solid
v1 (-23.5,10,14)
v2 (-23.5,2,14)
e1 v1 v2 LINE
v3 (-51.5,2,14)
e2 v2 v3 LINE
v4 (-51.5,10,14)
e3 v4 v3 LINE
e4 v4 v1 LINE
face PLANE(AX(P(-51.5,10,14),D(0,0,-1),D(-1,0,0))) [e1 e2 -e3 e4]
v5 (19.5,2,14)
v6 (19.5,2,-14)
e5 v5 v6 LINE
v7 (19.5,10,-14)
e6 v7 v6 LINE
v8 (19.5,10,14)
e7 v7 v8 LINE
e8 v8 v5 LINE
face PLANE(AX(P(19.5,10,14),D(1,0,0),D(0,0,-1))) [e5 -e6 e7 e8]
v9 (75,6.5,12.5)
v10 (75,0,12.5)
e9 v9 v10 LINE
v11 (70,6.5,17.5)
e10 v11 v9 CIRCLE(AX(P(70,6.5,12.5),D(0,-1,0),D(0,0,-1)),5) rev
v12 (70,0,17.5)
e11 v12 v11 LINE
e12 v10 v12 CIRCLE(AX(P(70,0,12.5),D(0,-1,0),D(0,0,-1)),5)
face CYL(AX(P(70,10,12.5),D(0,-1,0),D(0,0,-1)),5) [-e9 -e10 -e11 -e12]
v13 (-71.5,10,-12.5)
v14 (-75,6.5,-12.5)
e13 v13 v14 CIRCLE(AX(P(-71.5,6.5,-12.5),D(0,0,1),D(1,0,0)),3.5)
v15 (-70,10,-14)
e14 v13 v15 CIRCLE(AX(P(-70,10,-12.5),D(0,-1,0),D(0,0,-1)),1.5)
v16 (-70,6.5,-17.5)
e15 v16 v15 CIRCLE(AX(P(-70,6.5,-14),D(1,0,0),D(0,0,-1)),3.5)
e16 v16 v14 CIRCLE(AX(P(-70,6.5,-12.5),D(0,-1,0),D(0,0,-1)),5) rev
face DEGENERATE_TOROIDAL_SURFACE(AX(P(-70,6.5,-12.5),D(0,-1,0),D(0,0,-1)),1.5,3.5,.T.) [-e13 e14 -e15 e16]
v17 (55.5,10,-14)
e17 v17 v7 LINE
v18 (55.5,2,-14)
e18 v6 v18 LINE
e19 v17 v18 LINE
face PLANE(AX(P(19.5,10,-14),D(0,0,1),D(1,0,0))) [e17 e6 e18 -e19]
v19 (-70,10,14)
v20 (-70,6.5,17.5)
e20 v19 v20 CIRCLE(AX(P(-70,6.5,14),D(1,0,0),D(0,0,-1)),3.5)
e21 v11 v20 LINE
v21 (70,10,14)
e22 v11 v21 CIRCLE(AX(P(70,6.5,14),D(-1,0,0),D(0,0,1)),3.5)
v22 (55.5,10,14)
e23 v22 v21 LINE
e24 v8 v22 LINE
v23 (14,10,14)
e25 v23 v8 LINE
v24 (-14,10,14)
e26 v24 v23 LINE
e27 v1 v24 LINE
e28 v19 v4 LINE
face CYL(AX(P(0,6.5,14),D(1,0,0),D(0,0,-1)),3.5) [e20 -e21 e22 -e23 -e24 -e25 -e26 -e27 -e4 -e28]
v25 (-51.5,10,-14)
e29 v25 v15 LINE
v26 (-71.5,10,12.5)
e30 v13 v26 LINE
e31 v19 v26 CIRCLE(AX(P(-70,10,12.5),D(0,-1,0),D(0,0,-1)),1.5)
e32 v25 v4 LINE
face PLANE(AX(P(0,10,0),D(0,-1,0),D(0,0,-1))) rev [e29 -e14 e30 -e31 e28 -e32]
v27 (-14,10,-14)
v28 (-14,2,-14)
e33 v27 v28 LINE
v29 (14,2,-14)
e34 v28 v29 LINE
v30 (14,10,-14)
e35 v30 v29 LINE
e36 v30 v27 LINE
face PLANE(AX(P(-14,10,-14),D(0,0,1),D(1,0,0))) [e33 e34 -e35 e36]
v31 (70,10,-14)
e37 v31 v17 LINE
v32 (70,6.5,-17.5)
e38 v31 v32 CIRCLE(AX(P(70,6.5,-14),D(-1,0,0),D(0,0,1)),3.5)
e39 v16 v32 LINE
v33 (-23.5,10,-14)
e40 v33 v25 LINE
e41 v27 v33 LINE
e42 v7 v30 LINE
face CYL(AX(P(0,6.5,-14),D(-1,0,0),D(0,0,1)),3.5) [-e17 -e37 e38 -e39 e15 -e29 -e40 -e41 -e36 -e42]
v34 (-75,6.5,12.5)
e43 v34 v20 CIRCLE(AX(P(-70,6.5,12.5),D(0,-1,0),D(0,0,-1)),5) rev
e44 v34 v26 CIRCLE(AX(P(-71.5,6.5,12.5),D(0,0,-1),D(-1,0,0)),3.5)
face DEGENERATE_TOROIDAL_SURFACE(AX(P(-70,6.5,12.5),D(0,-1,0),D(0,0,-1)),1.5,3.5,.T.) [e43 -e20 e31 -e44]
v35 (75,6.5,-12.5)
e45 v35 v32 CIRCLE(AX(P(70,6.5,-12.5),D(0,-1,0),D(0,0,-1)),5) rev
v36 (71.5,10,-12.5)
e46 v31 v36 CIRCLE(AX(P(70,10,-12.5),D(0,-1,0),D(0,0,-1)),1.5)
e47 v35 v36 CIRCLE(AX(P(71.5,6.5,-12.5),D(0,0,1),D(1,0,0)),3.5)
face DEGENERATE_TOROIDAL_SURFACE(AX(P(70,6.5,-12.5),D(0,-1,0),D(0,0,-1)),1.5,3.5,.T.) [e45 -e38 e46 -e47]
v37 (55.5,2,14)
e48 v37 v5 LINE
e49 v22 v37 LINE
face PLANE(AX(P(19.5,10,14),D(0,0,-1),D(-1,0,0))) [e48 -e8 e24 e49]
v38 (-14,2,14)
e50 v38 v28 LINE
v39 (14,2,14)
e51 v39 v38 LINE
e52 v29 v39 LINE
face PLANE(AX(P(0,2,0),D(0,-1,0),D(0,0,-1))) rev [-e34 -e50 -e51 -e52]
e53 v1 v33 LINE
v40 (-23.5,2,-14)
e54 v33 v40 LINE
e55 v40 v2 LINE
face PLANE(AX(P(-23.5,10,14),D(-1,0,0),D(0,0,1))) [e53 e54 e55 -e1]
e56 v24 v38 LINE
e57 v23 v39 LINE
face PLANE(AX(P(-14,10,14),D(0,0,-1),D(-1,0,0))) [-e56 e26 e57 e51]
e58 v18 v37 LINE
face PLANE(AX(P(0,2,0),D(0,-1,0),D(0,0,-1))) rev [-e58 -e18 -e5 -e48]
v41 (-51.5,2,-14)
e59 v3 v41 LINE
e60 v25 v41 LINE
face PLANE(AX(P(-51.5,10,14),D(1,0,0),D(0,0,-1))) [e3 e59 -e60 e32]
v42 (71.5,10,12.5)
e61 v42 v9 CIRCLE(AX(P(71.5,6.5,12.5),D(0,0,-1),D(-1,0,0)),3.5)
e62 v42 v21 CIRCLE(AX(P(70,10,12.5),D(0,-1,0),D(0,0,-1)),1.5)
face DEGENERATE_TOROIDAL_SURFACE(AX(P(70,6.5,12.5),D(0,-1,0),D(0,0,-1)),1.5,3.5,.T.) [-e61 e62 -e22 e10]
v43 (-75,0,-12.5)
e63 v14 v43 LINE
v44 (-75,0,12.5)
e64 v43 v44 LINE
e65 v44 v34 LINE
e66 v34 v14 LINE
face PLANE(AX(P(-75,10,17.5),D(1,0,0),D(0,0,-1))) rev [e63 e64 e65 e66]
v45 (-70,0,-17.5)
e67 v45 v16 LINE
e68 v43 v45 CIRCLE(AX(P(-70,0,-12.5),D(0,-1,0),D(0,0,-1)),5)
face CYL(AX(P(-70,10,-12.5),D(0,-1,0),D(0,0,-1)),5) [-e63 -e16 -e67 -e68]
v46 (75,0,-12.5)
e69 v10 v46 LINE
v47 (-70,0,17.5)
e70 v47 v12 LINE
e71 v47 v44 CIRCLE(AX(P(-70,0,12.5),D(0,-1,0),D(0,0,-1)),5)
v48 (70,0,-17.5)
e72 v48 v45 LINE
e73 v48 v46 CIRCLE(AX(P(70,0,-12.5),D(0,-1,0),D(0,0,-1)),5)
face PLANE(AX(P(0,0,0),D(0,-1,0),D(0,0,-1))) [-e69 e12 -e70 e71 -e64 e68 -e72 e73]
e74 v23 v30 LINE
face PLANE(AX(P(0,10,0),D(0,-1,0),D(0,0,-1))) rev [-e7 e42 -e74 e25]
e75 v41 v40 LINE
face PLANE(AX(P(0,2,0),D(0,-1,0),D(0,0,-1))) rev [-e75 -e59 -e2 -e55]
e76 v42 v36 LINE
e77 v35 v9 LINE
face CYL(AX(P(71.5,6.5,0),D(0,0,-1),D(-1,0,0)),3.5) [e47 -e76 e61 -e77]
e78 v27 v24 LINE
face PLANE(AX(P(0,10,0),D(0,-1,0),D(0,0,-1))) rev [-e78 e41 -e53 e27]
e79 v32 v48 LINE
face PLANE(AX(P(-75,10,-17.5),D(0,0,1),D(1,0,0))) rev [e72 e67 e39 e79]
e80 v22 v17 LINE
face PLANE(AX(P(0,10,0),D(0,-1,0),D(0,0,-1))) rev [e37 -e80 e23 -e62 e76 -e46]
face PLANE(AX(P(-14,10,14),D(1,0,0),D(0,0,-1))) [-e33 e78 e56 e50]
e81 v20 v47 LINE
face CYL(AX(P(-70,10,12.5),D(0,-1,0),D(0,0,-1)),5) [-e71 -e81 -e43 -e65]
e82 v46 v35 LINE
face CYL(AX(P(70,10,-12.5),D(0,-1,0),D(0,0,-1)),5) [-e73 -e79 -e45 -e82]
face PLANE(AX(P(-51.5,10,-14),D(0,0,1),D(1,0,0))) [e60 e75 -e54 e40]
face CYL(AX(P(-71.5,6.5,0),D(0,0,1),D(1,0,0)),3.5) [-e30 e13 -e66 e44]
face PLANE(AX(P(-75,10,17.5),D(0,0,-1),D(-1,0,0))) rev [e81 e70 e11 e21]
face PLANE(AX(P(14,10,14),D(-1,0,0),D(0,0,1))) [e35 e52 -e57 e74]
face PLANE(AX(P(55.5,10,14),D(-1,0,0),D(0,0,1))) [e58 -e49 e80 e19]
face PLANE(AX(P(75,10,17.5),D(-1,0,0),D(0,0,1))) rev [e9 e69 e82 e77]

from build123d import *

# Parameters (mm, degrees)
SKETCH1_W           = 150
SKETCH1_H           = 35
SKETCH1_W_2         = 28
SKETCH1_H_2         = 28
SKETCH1_W_3         = 36
BOSS_EXTRUDE1_DEPTH = 10
SKETCH2_W           = 28
SKETCH2_H           = 28
SKETCH2_W_2         = 36
BOSS_EXTRUDE2_DEPTH = 2
FILLET3_R           = 3.5
FILLET4_R           = 5


# Some blends are built 0.0001 mm under size
with BuildPart() as part:
    # Sketch1 → Boss-Extrude1 (new body)
    with BuildSketch(Plane(origin=(0, 0, 0), x_dir=(1, 0, 0), z_dir=(0, 1, 0))):
        Rectangle(SKETCH1_W, SKETCH1_H)
        Rectangle(SKETCH1_W_2, SKETCH1_H_2, mode=Mode.SUBTRACT)
        with Locations((-37.5, 0)):
            Rectangle(SKETCH1_W_2, SKETCH1_H_2, mode=Mode.SUBTRACT)
        with Locations((37.5, 0)):
            Rectangle(SKETCH1_W_3, SKETCH1_H_2, mode=Mode.SUBTRACT)
    extrude(amount=BOSS_EXTRUDE1_DEPTH)

    # Sketch2 → Boss-Extrude2 (add)
    with BuildSketch(Plane.XZ):
        with Locations((-37.5, 0)):
            Rectangle(SKETCH2_W, SKETCH2_H)
        Rectangle(SKETCH2_W, SKETCH2_H)
        with Locations((37.5, 0)):
            Rectangle(SKETCH2_W_2, SKETCH2_H)
    extrude(amount=-BOSS_EXTRUDE2_DEPTH)

    # Fillet3
    fillet3_edges = [part.edges().sort_by_distance(p)[0] for p in [
        (-75, 10, 0),
        (0, 10, 17.5),
        (75, 10, 0),
        (0, 10, -17.5),
    ]]
    fillet(fillet3_edges, radius=FILLET3_R - 0.0001)  # a hair under: the kernel refuses the full size

    # Fillet4
    # the kernel refuses this fillet: 5 mm, written as the material it takes off along each edge
    with BuildSketch(Plane(origin=(70, 10, -12.5), x_dir=(1, 0, 0), z_dir=(0, 0, 1))) as fillet4_piece_1:
        with BuildLine():
            CenterArc((1.5001, -3.4999), 3.4999, 0, 90)
            Line((5, -3.4999), (5, 0))
            Line((5, 0), (1.5001, 0))
        make_face()
    revolve(axis=Axis((70, 10, -12.5), (0, 1, 0)), revolution_arc=90, mode=Mode.SUBTRACT)
    with BuildSketch(Plane(origin=(70, 10, 12.5), x_dir=(0, 0, 1), z_dir=(-1, 0, 0))) as fillet4_piece_2:
        with BuildLine():
            CenterArc((1.5001, -3.4999), 3.4999, 0, 90)
            Line((5, -3.4999), (5, 0))
            Line((5, 0), (1.5001, 0))
        make_face()
    revolve(axis=Axis((70, 10, 12.5), (0, 1, 0)), revolution_arc=90, mode=Mode.SUBTRACT)
    with BuildSketch(Plane(origin=(-70, 10, -12.5), x_dir=(0, 0, -1), z_dir=(1, 0, 0))) as fillet4_piece_3:
        with BuildLine():
            CenterArc((1.5001, -3.4999), 3.4999, 0, 90)
            Line((5, -3.4999), (5, 0))
            Line((5, 0), (1.5001, 0))
        make_face()
    revolve(axis=Axis((-70, 10, -12.5), (0, 1, 0)), revolution_arc=90, mode=Mode.SUBTRACT)
    with BuildSketch(Plane(origin=(-70, 10, 12.5), x_dir=(-1, 0, 0), z_dir=(0, 0, -1))) as fillet4_piece_4:
        with BuildLine():
            CenterArc((1.5001, -3.4999), 3.4999, 0, 90)
            Line((5, -3.4999), (5, 0))
            Line((5, 0), (1.5001, 0))
        make_face()
    revolve(axis=Axis((-70, 10, 12.5), (0, 1, 0)), revolution_arc=90, mode=Mode.SUBTRACT)
    with BuildSketch(Plane(origin=(-75, -12.5, 17.5), x_dir=(1, 0, 0), z_dir=(0, 1, 0)), Plane(origin=(-75, -12.5, -17.5), x_dir=(0, 0, 1), z_dir=(0, 1, 0))) as fillet4_piece_5:
        with BuildLine():
            CenterArc((FILLET4_R, FILLET4_R), FILLET4_R, 180, 90)
            Line((0, FILLET4_R), (0, 0))
            Line((0, 0), (FILLET4_R, 0))
        make_face()
    extrude(amount=22.5, mode=Mode.SUBTRACT)
    with BuildSketch(Plane(origin=(75, -12.5, -17.5), x_dir=(0, 0, 1), z_dir=(0, 1, 0)), Plane(origin=(75, -12.5, 17.5), x_dir=(-1, 0, 0), z_dir=(0, 1, 0))) as fillet4_piece_6:
        with BuildLine():
            CenterArc((FILLET4_R, -FILLET4_R), FILLET4_R, 90, 90)
            Line((0, -FILLET4_R), (0, 0))
            Line((0, 0), (FILLET4_R, 0))
        make_face()
    extrude(amount=22.5, mode=Mode.SUBTRACT)


solid = part.part
